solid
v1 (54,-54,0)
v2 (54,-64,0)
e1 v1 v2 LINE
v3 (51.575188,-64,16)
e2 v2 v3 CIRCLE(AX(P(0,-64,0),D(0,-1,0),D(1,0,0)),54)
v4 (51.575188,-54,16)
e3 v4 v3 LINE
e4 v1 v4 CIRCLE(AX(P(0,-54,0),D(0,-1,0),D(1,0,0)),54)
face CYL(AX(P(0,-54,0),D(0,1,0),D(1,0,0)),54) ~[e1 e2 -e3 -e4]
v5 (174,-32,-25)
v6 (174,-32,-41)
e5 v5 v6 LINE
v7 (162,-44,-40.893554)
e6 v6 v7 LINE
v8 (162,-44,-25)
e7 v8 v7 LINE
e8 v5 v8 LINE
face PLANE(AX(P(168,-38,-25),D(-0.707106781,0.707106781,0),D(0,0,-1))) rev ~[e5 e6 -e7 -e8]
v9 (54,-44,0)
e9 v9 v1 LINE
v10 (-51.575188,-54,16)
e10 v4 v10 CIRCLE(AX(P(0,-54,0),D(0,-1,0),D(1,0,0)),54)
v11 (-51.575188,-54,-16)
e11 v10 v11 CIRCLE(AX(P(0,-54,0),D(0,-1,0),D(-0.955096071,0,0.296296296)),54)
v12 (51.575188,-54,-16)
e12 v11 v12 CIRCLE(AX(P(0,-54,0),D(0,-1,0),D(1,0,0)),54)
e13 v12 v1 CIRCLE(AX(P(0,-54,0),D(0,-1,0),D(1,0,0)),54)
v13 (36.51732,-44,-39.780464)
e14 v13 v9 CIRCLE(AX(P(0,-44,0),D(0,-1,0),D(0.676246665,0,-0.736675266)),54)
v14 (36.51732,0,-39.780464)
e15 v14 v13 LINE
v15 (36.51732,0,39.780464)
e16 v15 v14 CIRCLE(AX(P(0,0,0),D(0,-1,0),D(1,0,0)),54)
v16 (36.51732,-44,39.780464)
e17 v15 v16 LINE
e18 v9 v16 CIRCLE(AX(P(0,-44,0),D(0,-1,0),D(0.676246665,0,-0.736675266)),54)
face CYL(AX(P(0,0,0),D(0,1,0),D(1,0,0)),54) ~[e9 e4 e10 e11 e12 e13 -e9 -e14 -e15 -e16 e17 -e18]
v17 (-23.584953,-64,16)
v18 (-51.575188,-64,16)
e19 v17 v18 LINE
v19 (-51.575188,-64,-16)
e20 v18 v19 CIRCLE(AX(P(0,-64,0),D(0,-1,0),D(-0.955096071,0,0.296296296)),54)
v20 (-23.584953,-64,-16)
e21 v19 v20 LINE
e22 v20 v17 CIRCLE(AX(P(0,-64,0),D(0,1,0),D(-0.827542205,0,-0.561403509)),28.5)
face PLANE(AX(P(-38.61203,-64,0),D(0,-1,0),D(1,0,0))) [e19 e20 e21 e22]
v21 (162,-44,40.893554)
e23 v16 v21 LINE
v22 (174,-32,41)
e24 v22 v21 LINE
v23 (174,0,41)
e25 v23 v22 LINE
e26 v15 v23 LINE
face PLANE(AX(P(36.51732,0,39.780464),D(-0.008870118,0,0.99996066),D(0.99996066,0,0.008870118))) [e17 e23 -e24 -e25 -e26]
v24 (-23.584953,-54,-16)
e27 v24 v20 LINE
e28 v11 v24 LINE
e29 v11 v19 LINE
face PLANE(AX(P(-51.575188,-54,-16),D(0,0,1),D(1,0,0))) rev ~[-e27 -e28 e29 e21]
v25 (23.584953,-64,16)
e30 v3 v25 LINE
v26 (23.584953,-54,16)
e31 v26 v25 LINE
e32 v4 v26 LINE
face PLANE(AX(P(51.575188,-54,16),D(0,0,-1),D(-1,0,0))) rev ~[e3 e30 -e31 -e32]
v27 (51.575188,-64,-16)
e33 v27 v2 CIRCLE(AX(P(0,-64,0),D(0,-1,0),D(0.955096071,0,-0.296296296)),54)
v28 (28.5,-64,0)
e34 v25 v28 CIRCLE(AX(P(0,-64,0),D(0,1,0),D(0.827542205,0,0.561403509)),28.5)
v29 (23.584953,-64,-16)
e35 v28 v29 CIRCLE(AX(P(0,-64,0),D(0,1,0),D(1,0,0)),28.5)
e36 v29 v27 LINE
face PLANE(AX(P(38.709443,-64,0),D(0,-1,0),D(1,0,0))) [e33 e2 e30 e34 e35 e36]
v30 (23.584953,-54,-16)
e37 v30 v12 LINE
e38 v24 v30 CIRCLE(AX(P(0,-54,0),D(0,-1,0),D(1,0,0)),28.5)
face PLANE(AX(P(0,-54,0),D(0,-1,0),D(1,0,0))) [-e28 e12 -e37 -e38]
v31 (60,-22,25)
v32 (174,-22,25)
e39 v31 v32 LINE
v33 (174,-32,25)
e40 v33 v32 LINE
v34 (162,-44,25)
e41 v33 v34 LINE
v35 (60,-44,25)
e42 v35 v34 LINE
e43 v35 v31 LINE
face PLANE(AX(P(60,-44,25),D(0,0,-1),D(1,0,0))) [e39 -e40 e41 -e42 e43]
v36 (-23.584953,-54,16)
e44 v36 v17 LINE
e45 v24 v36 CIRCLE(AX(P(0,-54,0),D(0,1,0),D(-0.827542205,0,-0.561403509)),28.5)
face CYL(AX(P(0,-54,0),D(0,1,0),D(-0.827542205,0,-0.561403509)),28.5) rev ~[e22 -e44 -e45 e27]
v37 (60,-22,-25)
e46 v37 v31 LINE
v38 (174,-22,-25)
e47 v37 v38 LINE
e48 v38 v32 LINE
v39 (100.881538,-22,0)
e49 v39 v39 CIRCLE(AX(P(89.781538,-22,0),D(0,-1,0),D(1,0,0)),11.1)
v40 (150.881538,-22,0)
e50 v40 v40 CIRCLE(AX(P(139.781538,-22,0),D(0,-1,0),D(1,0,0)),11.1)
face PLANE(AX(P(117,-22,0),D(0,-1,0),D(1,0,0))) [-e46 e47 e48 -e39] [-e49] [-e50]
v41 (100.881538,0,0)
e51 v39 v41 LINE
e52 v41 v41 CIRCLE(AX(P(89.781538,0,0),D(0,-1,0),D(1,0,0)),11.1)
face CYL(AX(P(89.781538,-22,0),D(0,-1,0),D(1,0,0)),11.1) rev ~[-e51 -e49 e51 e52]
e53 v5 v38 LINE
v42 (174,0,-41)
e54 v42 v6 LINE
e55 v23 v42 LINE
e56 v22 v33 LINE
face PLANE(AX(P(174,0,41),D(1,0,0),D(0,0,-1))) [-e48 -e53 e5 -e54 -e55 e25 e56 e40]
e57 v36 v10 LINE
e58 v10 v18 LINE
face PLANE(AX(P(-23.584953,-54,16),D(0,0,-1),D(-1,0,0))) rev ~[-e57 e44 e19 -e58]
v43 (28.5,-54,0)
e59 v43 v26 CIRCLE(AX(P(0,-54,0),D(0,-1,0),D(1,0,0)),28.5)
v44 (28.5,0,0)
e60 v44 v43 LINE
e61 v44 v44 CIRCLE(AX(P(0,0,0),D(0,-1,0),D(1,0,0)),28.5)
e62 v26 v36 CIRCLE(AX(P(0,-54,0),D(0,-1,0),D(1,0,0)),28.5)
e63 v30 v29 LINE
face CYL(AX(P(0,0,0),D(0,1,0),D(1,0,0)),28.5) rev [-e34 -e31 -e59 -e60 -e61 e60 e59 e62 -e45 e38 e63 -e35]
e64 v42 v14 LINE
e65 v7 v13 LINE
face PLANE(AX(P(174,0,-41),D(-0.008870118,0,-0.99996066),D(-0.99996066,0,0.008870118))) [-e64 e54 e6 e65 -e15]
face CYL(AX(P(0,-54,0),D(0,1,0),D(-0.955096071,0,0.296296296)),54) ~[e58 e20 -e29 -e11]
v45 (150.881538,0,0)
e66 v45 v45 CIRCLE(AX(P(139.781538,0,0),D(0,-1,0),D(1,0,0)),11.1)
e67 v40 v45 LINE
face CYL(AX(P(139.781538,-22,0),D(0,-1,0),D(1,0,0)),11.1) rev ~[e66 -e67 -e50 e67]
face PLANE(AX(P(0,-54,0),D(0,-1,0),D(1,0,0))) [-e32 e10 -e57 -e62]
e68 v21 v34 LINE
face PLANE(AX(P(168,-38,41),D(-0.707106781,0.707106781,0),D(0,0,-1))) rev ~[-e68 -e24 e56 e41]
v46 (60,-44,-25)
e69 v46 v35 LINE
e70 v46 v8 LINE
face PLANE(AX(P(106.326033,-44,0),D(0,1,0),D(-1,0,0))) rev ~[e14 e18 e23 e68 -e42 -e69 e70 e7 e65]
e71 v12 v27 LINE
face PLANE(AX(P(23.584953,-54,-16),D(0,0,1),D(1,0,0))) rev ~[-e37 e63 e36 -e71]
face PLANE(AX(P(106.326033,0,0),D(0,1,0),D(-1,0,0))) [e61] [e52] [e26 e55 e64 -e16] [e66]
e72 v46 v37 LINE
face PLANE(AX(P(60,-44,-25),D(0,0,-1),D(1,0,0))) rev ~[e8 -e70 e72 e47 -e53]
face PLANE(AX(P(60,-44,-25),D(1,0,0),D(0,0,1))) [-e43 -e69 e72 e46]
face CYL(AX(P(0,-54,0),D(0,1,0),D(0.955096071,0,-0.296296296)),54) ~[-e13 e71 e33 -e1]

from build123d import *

# Parameters (mm, degrees)
F0_R      = 54
F0_R_2    = 28.5
F1_DEPTH  = 54
F3_DEPTH  = 10
F5_DEPTH  = 44
F6_W      = 114
F6_H      = 50
F7_DEPTH  = 22
F8_SIZE   = 12
F9_R      = 11.1
F10_DEPTH = 22


# Not quite as in the source:
# - after a boolean that leaves OpenCascade's solid faulty, fix() repairs it


with BuildPart() as f1:
    # F0 (on Front) → F1 (new body)
    with BuildSketch(Plane.XZ):
        Circle(F0_R)
        Circle(F0_R_2, mode=Mode.SUBTRACT)
    extrude(amount=F1_DEPTH)

    # F2 (on face) → F3 (join)
    with BuildSketch(Plane.XZ.offset(54)):
        with BuildLine():
            Line((-23.5849528301, 16), (-51.5751878329, 16))
            ThreePointArc((-51.5751878329, 16), (-54, 0), (-51.5751878329, -16))
            Line((-51.5751878329, -16), (-23.5849528301, -16))
            ThreePointArc((-23.5849528301, -16), (-28.5, 0), (-23.5849528301, 16))
        make_face()
        with BuildLine():
            ThreePointArc((51.5751878329, -16), (53.3903556037, -8.0913489921), (54, 0))
            ThreePointArc((54, 0), (53.3903556037, 8.0913489921), (51.5751878329, 16))
            Line((51.5751878329, 16), (23.5849528301, 16))
            ThreePointArc((23.5849528301, 16), (27.2435419472, 8.368955859), (28.5, 0))
            ThreePointArc((28.5, 0), (27.2435419472, -8.368955859), (23.5849528301, -16))
            Line((23.5849528301, -16), (51.5751878329, -16))
        make_face()
    extrude(amount=F3_DEPTH)

    add(f1.part.fix(), mode=Mode.REPLACE)

    # F4 (on face) → F5 (join)
    with BuildSketch(Plane(origin=(0, 0, 0), x_dir=(-1, 0, 0), z_dir=(0, 1, 0))):
        with BuildLine():
            Line((-174, 41), (-174, 0))
            Line((-174, 0), (-174, -41))
            Line((-174, -41), (-36.5173199288, -39.7804643666))
            ThreePointArc((-36.5173199288, -39.7804643666), (-54, 0), (-36.5173199288, 39.7804643666))
            Line((-36.5173199288, 39.7804643666), (-174, 41))
        make_face()
    extrude(amount=-F5_DEPTH)

    # F6 (on face) → F7 (cut)
    with BuildSketch(Plane.XZ.offset(44)):
        with Locations((117, 0)):
            Rectangle(F6_W, F6_H)
    extrude(amount=-F7_DEPTH, mode=Mode.SUBTRACT)

    # F8
    f8_edges = [f1.edges().sort_by_distance(p)[0] for p in [
        (174, -44, 33),
        (174, -44, -33),
    ]]
    chamfer(f8_edges, length=F8_SIZE)

    # F9 (on face) → F10 (cut, through all)
    with BuildSketch(Plane.XZ.offset(22)):
        with Locations((139.781537652, 0)):
            Circle(F9_R)
        with Locations((89.781537652, 0)):
            Circle(F9_R)
    extrude(amount=-F10_DEPTH, mode=Mode.SUBTRACT)


solid = f1.part
